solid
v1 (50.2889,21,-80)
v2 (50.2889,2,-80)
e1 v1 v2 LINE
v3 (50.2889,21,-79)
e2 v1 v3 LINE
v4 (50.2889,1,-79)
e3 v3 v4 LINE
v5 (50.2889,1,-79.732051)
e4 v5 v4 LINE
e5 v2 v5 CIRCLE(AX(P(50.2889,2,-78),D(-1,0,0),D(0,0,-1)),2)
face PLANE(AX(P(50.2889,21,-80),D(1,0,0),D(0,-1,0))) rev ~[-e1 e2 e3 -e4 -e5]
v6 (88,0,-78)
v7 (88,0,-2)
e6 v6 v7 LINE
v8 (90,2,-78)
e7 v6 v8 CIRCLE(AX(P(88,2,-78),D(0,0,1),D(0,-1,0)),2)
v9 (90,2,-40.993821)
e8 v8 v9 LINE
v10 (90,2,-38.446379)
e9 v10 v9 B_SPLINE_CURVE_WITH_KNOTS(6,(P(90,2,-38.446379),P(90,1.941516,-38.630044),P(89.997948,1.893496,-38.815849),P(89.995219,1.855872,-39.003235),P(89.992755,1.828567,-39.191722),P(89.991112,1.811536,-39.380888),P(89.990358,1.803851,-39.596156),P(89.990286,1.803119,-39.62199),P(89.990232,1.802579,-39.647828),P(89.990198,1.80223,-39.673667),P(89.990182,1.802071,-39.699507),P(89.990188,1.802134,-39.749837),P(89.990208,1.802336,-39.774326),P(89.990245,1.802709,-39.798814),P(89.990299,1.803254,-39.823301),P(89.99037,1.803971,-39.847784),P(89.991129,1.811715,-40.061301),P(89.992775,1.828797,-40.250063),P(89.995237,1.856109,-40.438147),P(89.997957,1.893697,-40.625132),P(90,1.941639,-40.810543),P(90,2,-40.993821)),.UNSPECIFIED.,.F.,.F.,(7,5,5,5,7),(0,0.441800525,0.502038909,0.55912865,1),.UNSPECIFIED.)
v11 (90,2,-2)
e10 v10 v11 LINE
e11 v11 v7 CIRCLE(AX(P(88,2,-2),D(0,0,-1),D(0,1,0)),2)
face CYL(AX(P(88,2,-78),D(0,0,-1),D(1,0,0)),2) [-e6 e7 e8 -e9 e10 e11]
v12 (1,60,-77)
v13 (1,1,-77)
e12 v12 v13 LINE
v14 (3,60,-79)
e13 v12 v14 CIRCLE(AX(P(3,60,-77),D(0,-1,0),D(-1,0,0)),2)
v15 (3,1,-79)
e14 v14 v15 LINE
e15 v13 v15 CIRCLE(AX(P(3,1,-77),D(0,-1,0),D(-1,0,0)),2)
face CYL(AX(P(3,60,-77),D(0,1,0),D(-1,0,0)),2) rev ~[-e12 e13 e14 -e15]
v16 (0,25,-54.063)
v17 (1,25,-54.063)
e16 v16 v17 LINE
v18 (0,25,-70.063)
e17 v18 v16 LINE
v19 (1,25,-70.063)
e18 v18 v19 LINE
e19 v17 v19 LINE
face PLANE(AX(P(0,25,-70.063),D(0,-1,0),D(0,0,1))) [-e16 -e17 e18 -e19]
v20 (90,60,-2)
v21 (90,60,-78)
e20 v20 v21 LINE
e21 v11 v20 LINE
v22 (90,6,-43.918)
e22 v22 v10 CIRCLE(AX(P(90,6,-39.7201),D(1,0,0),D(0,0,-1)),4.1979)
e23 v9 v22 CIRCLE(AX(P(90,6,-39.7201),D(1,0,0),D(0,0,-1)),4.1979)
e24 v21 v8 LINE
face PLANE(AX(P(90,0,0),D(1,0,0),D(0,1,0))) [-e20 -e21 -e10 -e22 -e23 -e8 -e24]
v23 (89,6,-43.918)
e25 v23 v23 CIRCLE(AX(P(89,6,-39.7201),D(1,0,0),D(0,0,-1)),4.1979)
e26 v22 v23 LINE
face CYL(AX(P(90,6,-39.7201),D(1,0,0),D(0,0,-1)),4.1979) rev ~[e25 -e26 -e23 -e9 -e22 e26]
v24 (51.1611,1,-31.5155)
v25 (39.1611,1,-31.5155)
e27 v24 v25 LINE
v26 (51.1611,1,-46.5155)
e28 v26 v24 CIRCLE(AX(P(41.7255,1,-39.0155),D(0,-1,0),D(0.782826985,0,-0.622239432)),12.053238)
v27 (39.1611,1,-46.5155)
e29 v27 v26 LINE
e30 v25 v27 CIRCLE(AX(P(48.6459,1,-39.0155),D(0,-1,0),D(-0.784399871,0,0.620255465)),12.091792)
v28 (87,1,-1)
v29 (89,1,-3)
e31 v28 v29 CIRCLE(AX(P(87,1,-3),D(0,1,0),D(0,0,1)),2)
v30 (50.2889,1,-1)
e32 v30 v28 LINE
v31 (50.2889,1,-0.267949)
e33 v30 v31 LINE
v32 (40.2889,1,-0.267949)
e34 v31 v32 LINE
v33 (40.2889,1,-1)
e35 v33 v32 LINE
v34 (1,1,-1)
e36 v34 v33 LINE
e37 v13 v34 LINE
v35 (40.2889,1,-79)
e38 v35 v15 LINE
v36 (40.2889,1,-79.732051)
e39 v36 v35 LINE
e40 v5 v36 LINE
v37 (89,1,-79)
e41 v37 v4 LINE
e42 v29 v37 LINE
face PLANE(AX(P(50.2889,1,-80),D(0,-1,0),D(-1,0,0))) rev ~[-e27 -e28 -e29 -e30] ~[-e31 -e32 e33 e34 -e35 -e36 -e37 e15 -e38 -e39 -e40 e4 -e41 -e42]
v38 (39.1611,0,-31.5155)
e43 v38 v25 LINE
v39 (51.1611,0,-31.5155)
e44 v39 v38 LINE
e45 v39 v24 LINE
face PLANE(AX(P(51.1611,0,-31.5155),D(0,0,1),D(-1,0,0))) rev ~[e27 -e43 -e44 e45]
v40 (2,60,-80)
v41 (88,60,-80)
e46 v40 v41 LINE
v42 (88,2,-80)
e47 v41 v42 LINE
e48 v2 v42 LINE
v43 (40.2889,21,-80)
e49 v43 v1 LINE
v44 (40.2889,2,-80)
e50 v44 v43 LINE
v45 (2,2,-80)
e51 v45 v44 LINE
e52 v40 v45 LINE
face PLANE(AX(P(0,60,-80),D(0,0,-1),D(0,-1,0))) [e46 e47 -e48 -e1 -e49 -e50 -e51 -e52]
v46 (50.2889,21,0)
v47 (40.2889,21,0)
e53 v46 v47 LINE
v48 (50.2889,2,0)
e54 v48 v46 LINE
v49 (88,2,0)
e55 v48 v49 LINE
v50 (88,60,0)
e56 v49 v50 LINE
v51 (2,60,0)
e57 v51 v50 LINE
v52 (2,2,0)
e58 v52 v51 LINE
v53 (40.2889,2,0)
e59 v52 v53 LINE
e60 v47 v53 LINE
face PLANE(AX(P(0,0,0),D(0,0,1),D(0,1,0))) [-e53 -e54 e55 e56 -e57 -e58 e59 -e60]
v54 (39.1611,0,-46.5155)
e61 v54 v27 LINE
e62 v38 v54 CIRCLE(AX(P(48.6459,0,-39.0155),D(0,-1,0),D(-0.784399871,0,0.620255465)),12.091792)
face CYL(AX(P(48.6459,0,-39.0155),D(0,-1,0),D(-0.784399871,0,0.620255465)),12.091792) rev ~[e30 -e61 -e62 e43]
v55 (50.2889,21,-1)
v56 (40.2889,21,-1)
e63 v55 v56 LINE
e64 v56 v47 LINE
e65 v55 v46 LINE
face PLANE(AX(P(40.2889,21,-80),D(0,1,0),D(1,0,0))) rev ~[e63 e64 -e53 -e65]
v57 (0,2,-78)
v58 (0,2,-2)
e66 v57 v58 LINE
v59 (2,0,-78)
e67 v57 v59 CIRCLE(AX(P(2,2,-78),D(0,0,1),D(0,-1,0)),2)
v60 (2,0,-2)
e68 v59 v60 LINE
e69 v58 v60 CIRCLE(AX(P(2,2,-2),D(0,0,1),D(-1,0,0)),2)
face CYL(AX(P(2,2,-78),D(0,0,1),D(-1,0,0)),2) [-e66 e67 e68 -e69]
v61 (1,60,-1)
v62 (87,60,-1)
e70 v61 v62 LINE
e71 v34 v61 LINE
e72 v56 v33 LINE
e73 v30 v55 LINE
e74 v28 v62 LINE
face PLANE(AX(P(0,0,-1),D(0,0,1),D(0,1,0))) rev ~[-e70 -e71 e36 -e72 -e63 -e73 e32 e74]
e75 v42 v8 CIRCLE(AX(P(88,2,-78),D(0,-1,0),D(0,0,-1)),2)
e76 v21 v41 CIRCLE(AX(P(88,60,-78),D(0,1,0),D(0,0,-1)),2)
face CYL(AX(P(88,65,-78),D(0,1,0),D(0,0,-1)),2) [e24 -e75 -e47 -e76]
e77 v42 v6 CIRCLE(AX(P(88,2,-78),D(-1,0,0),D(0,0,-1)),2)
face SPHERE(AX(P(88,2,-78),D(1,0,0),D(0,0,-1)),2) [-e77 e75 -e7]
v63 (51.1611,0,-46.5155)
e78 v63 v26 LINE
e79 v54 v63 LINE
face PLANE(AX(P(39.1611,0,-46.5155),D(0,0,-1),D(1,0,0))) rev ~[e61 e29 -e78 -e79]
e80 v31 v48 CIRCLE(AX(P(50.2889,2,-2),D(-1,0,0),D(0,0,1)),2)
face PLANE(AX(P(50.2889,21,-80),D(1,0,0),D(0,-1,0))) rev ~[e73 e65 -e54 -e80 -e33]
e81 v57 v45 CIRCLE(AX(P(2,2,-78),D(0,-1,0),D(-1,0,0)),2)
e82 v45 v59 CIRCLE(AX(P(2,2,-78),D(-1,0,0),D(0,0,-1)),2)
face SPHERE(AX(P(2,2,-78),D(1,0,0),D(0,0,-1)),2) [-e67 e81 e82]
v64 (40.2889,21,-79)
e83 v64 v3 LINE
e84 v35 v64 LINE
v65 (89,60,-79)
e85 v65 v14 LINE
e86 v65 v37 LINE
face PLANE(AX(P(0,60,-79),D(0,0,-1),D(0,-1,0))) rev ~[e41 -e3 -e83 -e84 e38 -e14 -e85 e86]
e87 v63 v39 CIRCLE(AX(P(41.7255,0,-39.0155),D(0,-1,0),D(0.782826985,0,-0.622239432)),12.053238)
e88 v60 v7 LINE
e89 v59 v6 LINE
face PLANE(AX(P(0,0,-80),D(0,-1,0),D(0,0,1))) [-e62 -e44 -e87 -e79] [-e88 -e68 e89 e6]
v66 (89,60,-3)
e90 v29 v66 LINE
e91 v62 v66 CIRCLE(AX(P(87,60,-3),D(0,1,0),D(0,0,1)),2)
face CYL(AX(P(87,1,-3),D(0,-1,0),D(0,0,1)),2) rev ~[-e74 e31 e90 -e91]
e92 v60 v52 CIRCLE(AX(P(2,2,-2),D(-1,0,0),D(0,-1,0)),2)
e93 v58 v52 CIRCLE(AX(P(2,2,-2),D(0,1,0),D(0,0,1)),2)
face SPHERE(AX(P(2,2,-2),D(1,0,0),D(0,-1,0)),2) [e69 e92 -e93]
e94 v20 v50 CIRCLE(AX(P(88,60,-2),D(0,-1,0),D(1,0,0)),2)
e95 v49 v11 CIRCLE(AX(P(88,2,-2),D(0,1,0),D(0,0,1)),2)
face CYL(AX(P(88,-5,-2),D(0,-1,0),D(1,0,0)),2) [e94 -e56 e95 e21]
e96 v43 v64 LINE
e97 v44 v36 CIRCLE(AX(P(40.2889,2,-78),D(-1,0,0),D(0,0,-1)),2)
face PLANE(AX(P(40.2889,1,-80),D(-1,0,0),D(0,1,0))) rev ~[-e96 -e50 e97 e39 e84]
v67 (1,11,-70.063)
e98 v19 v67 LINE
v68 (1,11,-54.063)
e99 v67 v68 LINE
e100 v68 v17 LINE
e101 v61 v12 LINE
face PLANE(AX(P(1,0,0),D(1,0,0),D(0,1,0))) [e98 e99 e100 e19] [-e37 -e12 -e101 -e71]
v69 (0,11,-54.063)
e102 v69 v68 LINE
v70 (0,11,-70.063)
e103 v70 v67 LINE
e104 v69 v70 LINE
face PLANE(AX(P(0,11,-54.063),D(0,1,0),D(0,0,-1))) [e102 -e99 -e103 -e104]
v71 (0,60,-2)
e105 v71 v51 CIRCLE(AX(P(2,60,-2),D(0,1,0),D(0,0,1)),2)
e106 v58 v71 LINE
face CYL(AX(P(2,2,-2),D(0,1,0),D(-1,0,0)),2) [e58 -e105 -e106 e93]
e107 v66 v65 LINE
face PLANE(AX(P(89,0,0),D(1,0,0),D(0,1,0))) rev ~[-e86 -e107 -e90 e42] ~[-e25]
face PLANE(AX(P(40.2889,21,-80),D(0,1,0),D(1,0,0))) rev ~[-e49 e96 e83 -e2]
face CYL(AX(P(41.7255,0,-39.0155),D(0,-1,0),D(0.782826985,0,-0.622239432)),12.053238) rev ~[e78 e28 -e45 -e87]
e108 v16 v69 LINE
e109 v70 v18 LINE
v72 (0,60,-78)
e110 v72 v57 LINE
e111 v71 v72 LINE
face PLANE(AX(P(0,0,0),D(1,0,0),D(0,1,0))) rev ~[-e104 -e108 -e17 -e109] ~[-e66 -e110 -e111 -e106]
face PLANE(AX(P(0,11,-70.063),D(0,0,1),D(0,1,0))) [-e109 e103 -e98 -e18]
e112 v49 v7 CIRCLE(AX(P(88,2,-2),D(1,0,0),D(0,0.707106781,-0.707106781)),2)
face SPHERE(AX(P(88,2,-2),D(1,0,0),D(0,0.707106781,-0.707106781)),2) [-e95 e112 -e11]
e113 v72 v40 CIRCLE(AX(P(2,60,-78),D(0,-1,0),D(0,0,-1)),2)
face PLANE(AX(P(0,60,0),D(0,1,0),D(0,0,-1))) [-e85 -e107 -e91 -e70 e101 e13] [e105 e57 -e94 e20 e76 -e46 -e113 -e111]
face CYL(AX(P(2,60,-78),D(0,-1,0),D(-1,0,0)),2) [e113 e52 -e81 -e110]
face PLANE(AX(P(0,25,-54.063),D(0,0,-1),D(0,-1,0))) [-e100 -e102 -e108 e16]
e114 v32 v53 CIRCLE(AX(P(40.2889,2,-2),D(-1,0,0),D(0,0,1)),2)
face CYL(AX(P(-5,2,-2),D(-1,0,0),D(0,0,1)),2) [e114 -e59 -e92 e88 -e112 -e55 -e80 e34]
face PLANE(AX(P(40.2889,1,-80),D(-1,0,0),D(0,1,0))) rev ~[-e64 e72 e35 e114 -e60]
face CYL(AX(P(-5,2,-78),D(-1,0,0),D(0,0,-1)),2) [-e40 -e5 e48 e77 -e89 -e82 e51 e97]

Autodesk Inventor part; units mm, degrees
ref_plane "YZ Plane" through (0, 0, 0) normal (1, 0, 0) x (0, 1, 0)
ref_plane "XZ Plane" through (0, 0, 0) normal (0, 1, 0) x (-1, 0, 0)
ref_plane "XY Plane" through (0, 0, 0) normal (0, 0, 1) x (1, 0, 0)
sketch "Esquisse1" plane through (0, 0, 0) normal (1, 0, 0) x (0, 1, 0)
  line L0 (0, 0) -> (60, 0)
  line L1 (60, 0) -> (60, -80)
  line L2 (60, -80) -> (0, -80)
  line L3 (0, -80) -> (0, 0)
  line L4 (0, -45) -> (0, -35)
  line L5 (0, -35) -> (0, -45)
  point P0 (12.5, -45)
  point P1 (0, -40)
  point P2 (0, -40)
  dimension "d0" = 80
  dimension "d1" = 60
  dimension "d4" = 40
extrude "Extrusion1" add sketch "Esquisse1" along normal blind 90
sketch "Esquisse2" plane through (0, 0, 0) normal (-1, 0, 0) x (0, 0, 1)
  line L0 (0, 0) -> (-80, 0) projected
  line L1 (-45, 0) -> (-35, 0)
  line L2 (0, 0) -> (-80, 0) projected
  point P0 (-40, 0)
  point P1 (-40, 0)
  point P2 (-40, 1)
  point P3 (-41.0501, 0)
  point P4 (-35, 9.6008)
  point P5 (-45, 11)
  dimension "d9" = 40
  dimension "d14" = 80
shell "Coque1" thickness 1 removed faces 1 at (30, 60, -53.3333)
sketch "Esquisse3" plane through (0, 0, 0) normal (-1, 0, 0) x (0, 0, 1)
  point P0 (0, 0)
sketch "Esquisse4" plane through (0, 0, 0) normal (-1, 0, 0) x (0, 0, 1)
  point P0 (0, 0)
sketch "Esquisse5" plane through (0, 0, -80) normal (0, 0, -1) x (-1, 0, 0)
  line L0 (-50.2889, 1) -> (-40.2889, 1)
  line L1 (-40.2889, 1) -> (-40.2889, 21)
  line L2 (-40.2889, 21) -> (-50.2889, 21)
  line L3 (-50.2889, 21) -> (-50.2889, 1)
  line L4 (0, 0) -> (-90, 0) projected
  line L5 (0, 0) -> (-90, 0) projected
  line L6 (-1, 1) -> (-89, 1) projected
  point P0 (-45, 0)
  point P1 (-40.2889, 0)
  point P2 (-49.4557, 1)
  point P3 (-46.3284, -7.001)
  point P4 (-44.591, 0)
  point P5 (-46.3284, -7.537)
  point P6 (-50.2889, 11)
  point P7 (-50.2889, 11)
  point P8 (-49.5179, 0)
  point P9 (-49.2163, 0)
  dimension "d15" = 10
  dimension "d16" = 20
  dimension "d17" = 1
  dimension "d18" = 88
  dimension "d19" = 90
sketch "Esquisse8" plane through (0, 0, 0) normal (0, 0, 1) x (1, 0, 0)
  point P0 (0, 0)
extrude "Extrusion2" cut sketch "Esquisse5" against normal blind 90
sketch "Esquisse9" plane through (0, 0, 0) normal (-1, 0, 0) x (0, 0, 1)
  line L0 (-50.5224, 1) -> (-50.5224, 2)
  line L1 (-66.5224, 2) -> (-66.5224, 1)
  line L2 (-70.063, 25) -> (-54.063, 25)
  line L3 (-54.063, 25) -> (-54.063, 11)
  line L4 (-54.063, 11) -> (-70.063, 11)
  line L5 (-70.063, 11) -> (-70.063, 25)
  line L6 (0, 0) -> (-80, 0) projected
  dimension "d23" = 1
  dimension "d24" = 11
  dimension "d25" = 14
  dimension "d26" = 16
extrude "Extrusion3" cut sketch "Esquisse9" against normal blind 50
sketch "Esquisse10" plane through (90, 0, 0) normal (1, 0, 0) x (0, 0, -1)
  circle A0 centre (39.7201, 6) radius 4.1979
  line L0 (0, 0) -> (80, 0) projected
  dimension "d29" = 6
extrude "Extrusion4" cut sketch "Esquisse10" against normal blind 50
sketch "Esquisse11" plane through (0, 0, -80) normal (0, -1, 0) x (1, 0, 0)
  line L0 (39.1611, 33.4845) -> (51.1611, 33.4845)
  line L1 (51.1611, 33.4845) -> (51.1611, 48.4845)
  line L2 (51.1611, 48.4845) -> (39.1611, 48.4845)
  line L3 (39.1611, 48.4845) -> (39.1611, 33.4845)
  arc A0 (39.1611, 48.4845) -> (39.1611, 33.4845) centre (48.6459, 40.9845) ccw
  arc A1 (51.1611, 33.4845) -> (51.1611, 48.4845) centre (41.7255, 40.9845) ccw
  point P0 (0, 80)
  point P1 (36.5541, 40.9845)
  point P2 (53.7787, 40.9845)
  point P3 (45.1019, 41.2499)
  point P4 (27.4865, 33.4896)
  point P5 (27.0422, 33.4896)
  dimension "d32" = 15
  dimension "d33" = 12
  dimension "d34" = 6.9205
  dimension "d35" = 12.0918
extrude "Extrusion5" cut sketch "Esquisse11" against normal blind 10
fillet "Congé1" radius 2 2 edges at (1, 30.5, -79) (45, 0, -80)
fillet "Congé2" radius 2 2 edges at (90, 30, 0) (45, 0, 0)
fillet "Congé3" radius 2 5 edges at (90, 0.5858, -79.4142) (90, 31, -80) (89.4142, 0.5858, -0.5858) (90, 0, -40) (89, 30.5, -1)
fillet "Congé4" radius 2 5 edges at (0, 0.5858, -79.4142) (0, 31, -80) (0, 0.5858, -0.5858) (0, 31, 0) (0, 0, -40)
properties part number "corps" material "Plastique ABS"
